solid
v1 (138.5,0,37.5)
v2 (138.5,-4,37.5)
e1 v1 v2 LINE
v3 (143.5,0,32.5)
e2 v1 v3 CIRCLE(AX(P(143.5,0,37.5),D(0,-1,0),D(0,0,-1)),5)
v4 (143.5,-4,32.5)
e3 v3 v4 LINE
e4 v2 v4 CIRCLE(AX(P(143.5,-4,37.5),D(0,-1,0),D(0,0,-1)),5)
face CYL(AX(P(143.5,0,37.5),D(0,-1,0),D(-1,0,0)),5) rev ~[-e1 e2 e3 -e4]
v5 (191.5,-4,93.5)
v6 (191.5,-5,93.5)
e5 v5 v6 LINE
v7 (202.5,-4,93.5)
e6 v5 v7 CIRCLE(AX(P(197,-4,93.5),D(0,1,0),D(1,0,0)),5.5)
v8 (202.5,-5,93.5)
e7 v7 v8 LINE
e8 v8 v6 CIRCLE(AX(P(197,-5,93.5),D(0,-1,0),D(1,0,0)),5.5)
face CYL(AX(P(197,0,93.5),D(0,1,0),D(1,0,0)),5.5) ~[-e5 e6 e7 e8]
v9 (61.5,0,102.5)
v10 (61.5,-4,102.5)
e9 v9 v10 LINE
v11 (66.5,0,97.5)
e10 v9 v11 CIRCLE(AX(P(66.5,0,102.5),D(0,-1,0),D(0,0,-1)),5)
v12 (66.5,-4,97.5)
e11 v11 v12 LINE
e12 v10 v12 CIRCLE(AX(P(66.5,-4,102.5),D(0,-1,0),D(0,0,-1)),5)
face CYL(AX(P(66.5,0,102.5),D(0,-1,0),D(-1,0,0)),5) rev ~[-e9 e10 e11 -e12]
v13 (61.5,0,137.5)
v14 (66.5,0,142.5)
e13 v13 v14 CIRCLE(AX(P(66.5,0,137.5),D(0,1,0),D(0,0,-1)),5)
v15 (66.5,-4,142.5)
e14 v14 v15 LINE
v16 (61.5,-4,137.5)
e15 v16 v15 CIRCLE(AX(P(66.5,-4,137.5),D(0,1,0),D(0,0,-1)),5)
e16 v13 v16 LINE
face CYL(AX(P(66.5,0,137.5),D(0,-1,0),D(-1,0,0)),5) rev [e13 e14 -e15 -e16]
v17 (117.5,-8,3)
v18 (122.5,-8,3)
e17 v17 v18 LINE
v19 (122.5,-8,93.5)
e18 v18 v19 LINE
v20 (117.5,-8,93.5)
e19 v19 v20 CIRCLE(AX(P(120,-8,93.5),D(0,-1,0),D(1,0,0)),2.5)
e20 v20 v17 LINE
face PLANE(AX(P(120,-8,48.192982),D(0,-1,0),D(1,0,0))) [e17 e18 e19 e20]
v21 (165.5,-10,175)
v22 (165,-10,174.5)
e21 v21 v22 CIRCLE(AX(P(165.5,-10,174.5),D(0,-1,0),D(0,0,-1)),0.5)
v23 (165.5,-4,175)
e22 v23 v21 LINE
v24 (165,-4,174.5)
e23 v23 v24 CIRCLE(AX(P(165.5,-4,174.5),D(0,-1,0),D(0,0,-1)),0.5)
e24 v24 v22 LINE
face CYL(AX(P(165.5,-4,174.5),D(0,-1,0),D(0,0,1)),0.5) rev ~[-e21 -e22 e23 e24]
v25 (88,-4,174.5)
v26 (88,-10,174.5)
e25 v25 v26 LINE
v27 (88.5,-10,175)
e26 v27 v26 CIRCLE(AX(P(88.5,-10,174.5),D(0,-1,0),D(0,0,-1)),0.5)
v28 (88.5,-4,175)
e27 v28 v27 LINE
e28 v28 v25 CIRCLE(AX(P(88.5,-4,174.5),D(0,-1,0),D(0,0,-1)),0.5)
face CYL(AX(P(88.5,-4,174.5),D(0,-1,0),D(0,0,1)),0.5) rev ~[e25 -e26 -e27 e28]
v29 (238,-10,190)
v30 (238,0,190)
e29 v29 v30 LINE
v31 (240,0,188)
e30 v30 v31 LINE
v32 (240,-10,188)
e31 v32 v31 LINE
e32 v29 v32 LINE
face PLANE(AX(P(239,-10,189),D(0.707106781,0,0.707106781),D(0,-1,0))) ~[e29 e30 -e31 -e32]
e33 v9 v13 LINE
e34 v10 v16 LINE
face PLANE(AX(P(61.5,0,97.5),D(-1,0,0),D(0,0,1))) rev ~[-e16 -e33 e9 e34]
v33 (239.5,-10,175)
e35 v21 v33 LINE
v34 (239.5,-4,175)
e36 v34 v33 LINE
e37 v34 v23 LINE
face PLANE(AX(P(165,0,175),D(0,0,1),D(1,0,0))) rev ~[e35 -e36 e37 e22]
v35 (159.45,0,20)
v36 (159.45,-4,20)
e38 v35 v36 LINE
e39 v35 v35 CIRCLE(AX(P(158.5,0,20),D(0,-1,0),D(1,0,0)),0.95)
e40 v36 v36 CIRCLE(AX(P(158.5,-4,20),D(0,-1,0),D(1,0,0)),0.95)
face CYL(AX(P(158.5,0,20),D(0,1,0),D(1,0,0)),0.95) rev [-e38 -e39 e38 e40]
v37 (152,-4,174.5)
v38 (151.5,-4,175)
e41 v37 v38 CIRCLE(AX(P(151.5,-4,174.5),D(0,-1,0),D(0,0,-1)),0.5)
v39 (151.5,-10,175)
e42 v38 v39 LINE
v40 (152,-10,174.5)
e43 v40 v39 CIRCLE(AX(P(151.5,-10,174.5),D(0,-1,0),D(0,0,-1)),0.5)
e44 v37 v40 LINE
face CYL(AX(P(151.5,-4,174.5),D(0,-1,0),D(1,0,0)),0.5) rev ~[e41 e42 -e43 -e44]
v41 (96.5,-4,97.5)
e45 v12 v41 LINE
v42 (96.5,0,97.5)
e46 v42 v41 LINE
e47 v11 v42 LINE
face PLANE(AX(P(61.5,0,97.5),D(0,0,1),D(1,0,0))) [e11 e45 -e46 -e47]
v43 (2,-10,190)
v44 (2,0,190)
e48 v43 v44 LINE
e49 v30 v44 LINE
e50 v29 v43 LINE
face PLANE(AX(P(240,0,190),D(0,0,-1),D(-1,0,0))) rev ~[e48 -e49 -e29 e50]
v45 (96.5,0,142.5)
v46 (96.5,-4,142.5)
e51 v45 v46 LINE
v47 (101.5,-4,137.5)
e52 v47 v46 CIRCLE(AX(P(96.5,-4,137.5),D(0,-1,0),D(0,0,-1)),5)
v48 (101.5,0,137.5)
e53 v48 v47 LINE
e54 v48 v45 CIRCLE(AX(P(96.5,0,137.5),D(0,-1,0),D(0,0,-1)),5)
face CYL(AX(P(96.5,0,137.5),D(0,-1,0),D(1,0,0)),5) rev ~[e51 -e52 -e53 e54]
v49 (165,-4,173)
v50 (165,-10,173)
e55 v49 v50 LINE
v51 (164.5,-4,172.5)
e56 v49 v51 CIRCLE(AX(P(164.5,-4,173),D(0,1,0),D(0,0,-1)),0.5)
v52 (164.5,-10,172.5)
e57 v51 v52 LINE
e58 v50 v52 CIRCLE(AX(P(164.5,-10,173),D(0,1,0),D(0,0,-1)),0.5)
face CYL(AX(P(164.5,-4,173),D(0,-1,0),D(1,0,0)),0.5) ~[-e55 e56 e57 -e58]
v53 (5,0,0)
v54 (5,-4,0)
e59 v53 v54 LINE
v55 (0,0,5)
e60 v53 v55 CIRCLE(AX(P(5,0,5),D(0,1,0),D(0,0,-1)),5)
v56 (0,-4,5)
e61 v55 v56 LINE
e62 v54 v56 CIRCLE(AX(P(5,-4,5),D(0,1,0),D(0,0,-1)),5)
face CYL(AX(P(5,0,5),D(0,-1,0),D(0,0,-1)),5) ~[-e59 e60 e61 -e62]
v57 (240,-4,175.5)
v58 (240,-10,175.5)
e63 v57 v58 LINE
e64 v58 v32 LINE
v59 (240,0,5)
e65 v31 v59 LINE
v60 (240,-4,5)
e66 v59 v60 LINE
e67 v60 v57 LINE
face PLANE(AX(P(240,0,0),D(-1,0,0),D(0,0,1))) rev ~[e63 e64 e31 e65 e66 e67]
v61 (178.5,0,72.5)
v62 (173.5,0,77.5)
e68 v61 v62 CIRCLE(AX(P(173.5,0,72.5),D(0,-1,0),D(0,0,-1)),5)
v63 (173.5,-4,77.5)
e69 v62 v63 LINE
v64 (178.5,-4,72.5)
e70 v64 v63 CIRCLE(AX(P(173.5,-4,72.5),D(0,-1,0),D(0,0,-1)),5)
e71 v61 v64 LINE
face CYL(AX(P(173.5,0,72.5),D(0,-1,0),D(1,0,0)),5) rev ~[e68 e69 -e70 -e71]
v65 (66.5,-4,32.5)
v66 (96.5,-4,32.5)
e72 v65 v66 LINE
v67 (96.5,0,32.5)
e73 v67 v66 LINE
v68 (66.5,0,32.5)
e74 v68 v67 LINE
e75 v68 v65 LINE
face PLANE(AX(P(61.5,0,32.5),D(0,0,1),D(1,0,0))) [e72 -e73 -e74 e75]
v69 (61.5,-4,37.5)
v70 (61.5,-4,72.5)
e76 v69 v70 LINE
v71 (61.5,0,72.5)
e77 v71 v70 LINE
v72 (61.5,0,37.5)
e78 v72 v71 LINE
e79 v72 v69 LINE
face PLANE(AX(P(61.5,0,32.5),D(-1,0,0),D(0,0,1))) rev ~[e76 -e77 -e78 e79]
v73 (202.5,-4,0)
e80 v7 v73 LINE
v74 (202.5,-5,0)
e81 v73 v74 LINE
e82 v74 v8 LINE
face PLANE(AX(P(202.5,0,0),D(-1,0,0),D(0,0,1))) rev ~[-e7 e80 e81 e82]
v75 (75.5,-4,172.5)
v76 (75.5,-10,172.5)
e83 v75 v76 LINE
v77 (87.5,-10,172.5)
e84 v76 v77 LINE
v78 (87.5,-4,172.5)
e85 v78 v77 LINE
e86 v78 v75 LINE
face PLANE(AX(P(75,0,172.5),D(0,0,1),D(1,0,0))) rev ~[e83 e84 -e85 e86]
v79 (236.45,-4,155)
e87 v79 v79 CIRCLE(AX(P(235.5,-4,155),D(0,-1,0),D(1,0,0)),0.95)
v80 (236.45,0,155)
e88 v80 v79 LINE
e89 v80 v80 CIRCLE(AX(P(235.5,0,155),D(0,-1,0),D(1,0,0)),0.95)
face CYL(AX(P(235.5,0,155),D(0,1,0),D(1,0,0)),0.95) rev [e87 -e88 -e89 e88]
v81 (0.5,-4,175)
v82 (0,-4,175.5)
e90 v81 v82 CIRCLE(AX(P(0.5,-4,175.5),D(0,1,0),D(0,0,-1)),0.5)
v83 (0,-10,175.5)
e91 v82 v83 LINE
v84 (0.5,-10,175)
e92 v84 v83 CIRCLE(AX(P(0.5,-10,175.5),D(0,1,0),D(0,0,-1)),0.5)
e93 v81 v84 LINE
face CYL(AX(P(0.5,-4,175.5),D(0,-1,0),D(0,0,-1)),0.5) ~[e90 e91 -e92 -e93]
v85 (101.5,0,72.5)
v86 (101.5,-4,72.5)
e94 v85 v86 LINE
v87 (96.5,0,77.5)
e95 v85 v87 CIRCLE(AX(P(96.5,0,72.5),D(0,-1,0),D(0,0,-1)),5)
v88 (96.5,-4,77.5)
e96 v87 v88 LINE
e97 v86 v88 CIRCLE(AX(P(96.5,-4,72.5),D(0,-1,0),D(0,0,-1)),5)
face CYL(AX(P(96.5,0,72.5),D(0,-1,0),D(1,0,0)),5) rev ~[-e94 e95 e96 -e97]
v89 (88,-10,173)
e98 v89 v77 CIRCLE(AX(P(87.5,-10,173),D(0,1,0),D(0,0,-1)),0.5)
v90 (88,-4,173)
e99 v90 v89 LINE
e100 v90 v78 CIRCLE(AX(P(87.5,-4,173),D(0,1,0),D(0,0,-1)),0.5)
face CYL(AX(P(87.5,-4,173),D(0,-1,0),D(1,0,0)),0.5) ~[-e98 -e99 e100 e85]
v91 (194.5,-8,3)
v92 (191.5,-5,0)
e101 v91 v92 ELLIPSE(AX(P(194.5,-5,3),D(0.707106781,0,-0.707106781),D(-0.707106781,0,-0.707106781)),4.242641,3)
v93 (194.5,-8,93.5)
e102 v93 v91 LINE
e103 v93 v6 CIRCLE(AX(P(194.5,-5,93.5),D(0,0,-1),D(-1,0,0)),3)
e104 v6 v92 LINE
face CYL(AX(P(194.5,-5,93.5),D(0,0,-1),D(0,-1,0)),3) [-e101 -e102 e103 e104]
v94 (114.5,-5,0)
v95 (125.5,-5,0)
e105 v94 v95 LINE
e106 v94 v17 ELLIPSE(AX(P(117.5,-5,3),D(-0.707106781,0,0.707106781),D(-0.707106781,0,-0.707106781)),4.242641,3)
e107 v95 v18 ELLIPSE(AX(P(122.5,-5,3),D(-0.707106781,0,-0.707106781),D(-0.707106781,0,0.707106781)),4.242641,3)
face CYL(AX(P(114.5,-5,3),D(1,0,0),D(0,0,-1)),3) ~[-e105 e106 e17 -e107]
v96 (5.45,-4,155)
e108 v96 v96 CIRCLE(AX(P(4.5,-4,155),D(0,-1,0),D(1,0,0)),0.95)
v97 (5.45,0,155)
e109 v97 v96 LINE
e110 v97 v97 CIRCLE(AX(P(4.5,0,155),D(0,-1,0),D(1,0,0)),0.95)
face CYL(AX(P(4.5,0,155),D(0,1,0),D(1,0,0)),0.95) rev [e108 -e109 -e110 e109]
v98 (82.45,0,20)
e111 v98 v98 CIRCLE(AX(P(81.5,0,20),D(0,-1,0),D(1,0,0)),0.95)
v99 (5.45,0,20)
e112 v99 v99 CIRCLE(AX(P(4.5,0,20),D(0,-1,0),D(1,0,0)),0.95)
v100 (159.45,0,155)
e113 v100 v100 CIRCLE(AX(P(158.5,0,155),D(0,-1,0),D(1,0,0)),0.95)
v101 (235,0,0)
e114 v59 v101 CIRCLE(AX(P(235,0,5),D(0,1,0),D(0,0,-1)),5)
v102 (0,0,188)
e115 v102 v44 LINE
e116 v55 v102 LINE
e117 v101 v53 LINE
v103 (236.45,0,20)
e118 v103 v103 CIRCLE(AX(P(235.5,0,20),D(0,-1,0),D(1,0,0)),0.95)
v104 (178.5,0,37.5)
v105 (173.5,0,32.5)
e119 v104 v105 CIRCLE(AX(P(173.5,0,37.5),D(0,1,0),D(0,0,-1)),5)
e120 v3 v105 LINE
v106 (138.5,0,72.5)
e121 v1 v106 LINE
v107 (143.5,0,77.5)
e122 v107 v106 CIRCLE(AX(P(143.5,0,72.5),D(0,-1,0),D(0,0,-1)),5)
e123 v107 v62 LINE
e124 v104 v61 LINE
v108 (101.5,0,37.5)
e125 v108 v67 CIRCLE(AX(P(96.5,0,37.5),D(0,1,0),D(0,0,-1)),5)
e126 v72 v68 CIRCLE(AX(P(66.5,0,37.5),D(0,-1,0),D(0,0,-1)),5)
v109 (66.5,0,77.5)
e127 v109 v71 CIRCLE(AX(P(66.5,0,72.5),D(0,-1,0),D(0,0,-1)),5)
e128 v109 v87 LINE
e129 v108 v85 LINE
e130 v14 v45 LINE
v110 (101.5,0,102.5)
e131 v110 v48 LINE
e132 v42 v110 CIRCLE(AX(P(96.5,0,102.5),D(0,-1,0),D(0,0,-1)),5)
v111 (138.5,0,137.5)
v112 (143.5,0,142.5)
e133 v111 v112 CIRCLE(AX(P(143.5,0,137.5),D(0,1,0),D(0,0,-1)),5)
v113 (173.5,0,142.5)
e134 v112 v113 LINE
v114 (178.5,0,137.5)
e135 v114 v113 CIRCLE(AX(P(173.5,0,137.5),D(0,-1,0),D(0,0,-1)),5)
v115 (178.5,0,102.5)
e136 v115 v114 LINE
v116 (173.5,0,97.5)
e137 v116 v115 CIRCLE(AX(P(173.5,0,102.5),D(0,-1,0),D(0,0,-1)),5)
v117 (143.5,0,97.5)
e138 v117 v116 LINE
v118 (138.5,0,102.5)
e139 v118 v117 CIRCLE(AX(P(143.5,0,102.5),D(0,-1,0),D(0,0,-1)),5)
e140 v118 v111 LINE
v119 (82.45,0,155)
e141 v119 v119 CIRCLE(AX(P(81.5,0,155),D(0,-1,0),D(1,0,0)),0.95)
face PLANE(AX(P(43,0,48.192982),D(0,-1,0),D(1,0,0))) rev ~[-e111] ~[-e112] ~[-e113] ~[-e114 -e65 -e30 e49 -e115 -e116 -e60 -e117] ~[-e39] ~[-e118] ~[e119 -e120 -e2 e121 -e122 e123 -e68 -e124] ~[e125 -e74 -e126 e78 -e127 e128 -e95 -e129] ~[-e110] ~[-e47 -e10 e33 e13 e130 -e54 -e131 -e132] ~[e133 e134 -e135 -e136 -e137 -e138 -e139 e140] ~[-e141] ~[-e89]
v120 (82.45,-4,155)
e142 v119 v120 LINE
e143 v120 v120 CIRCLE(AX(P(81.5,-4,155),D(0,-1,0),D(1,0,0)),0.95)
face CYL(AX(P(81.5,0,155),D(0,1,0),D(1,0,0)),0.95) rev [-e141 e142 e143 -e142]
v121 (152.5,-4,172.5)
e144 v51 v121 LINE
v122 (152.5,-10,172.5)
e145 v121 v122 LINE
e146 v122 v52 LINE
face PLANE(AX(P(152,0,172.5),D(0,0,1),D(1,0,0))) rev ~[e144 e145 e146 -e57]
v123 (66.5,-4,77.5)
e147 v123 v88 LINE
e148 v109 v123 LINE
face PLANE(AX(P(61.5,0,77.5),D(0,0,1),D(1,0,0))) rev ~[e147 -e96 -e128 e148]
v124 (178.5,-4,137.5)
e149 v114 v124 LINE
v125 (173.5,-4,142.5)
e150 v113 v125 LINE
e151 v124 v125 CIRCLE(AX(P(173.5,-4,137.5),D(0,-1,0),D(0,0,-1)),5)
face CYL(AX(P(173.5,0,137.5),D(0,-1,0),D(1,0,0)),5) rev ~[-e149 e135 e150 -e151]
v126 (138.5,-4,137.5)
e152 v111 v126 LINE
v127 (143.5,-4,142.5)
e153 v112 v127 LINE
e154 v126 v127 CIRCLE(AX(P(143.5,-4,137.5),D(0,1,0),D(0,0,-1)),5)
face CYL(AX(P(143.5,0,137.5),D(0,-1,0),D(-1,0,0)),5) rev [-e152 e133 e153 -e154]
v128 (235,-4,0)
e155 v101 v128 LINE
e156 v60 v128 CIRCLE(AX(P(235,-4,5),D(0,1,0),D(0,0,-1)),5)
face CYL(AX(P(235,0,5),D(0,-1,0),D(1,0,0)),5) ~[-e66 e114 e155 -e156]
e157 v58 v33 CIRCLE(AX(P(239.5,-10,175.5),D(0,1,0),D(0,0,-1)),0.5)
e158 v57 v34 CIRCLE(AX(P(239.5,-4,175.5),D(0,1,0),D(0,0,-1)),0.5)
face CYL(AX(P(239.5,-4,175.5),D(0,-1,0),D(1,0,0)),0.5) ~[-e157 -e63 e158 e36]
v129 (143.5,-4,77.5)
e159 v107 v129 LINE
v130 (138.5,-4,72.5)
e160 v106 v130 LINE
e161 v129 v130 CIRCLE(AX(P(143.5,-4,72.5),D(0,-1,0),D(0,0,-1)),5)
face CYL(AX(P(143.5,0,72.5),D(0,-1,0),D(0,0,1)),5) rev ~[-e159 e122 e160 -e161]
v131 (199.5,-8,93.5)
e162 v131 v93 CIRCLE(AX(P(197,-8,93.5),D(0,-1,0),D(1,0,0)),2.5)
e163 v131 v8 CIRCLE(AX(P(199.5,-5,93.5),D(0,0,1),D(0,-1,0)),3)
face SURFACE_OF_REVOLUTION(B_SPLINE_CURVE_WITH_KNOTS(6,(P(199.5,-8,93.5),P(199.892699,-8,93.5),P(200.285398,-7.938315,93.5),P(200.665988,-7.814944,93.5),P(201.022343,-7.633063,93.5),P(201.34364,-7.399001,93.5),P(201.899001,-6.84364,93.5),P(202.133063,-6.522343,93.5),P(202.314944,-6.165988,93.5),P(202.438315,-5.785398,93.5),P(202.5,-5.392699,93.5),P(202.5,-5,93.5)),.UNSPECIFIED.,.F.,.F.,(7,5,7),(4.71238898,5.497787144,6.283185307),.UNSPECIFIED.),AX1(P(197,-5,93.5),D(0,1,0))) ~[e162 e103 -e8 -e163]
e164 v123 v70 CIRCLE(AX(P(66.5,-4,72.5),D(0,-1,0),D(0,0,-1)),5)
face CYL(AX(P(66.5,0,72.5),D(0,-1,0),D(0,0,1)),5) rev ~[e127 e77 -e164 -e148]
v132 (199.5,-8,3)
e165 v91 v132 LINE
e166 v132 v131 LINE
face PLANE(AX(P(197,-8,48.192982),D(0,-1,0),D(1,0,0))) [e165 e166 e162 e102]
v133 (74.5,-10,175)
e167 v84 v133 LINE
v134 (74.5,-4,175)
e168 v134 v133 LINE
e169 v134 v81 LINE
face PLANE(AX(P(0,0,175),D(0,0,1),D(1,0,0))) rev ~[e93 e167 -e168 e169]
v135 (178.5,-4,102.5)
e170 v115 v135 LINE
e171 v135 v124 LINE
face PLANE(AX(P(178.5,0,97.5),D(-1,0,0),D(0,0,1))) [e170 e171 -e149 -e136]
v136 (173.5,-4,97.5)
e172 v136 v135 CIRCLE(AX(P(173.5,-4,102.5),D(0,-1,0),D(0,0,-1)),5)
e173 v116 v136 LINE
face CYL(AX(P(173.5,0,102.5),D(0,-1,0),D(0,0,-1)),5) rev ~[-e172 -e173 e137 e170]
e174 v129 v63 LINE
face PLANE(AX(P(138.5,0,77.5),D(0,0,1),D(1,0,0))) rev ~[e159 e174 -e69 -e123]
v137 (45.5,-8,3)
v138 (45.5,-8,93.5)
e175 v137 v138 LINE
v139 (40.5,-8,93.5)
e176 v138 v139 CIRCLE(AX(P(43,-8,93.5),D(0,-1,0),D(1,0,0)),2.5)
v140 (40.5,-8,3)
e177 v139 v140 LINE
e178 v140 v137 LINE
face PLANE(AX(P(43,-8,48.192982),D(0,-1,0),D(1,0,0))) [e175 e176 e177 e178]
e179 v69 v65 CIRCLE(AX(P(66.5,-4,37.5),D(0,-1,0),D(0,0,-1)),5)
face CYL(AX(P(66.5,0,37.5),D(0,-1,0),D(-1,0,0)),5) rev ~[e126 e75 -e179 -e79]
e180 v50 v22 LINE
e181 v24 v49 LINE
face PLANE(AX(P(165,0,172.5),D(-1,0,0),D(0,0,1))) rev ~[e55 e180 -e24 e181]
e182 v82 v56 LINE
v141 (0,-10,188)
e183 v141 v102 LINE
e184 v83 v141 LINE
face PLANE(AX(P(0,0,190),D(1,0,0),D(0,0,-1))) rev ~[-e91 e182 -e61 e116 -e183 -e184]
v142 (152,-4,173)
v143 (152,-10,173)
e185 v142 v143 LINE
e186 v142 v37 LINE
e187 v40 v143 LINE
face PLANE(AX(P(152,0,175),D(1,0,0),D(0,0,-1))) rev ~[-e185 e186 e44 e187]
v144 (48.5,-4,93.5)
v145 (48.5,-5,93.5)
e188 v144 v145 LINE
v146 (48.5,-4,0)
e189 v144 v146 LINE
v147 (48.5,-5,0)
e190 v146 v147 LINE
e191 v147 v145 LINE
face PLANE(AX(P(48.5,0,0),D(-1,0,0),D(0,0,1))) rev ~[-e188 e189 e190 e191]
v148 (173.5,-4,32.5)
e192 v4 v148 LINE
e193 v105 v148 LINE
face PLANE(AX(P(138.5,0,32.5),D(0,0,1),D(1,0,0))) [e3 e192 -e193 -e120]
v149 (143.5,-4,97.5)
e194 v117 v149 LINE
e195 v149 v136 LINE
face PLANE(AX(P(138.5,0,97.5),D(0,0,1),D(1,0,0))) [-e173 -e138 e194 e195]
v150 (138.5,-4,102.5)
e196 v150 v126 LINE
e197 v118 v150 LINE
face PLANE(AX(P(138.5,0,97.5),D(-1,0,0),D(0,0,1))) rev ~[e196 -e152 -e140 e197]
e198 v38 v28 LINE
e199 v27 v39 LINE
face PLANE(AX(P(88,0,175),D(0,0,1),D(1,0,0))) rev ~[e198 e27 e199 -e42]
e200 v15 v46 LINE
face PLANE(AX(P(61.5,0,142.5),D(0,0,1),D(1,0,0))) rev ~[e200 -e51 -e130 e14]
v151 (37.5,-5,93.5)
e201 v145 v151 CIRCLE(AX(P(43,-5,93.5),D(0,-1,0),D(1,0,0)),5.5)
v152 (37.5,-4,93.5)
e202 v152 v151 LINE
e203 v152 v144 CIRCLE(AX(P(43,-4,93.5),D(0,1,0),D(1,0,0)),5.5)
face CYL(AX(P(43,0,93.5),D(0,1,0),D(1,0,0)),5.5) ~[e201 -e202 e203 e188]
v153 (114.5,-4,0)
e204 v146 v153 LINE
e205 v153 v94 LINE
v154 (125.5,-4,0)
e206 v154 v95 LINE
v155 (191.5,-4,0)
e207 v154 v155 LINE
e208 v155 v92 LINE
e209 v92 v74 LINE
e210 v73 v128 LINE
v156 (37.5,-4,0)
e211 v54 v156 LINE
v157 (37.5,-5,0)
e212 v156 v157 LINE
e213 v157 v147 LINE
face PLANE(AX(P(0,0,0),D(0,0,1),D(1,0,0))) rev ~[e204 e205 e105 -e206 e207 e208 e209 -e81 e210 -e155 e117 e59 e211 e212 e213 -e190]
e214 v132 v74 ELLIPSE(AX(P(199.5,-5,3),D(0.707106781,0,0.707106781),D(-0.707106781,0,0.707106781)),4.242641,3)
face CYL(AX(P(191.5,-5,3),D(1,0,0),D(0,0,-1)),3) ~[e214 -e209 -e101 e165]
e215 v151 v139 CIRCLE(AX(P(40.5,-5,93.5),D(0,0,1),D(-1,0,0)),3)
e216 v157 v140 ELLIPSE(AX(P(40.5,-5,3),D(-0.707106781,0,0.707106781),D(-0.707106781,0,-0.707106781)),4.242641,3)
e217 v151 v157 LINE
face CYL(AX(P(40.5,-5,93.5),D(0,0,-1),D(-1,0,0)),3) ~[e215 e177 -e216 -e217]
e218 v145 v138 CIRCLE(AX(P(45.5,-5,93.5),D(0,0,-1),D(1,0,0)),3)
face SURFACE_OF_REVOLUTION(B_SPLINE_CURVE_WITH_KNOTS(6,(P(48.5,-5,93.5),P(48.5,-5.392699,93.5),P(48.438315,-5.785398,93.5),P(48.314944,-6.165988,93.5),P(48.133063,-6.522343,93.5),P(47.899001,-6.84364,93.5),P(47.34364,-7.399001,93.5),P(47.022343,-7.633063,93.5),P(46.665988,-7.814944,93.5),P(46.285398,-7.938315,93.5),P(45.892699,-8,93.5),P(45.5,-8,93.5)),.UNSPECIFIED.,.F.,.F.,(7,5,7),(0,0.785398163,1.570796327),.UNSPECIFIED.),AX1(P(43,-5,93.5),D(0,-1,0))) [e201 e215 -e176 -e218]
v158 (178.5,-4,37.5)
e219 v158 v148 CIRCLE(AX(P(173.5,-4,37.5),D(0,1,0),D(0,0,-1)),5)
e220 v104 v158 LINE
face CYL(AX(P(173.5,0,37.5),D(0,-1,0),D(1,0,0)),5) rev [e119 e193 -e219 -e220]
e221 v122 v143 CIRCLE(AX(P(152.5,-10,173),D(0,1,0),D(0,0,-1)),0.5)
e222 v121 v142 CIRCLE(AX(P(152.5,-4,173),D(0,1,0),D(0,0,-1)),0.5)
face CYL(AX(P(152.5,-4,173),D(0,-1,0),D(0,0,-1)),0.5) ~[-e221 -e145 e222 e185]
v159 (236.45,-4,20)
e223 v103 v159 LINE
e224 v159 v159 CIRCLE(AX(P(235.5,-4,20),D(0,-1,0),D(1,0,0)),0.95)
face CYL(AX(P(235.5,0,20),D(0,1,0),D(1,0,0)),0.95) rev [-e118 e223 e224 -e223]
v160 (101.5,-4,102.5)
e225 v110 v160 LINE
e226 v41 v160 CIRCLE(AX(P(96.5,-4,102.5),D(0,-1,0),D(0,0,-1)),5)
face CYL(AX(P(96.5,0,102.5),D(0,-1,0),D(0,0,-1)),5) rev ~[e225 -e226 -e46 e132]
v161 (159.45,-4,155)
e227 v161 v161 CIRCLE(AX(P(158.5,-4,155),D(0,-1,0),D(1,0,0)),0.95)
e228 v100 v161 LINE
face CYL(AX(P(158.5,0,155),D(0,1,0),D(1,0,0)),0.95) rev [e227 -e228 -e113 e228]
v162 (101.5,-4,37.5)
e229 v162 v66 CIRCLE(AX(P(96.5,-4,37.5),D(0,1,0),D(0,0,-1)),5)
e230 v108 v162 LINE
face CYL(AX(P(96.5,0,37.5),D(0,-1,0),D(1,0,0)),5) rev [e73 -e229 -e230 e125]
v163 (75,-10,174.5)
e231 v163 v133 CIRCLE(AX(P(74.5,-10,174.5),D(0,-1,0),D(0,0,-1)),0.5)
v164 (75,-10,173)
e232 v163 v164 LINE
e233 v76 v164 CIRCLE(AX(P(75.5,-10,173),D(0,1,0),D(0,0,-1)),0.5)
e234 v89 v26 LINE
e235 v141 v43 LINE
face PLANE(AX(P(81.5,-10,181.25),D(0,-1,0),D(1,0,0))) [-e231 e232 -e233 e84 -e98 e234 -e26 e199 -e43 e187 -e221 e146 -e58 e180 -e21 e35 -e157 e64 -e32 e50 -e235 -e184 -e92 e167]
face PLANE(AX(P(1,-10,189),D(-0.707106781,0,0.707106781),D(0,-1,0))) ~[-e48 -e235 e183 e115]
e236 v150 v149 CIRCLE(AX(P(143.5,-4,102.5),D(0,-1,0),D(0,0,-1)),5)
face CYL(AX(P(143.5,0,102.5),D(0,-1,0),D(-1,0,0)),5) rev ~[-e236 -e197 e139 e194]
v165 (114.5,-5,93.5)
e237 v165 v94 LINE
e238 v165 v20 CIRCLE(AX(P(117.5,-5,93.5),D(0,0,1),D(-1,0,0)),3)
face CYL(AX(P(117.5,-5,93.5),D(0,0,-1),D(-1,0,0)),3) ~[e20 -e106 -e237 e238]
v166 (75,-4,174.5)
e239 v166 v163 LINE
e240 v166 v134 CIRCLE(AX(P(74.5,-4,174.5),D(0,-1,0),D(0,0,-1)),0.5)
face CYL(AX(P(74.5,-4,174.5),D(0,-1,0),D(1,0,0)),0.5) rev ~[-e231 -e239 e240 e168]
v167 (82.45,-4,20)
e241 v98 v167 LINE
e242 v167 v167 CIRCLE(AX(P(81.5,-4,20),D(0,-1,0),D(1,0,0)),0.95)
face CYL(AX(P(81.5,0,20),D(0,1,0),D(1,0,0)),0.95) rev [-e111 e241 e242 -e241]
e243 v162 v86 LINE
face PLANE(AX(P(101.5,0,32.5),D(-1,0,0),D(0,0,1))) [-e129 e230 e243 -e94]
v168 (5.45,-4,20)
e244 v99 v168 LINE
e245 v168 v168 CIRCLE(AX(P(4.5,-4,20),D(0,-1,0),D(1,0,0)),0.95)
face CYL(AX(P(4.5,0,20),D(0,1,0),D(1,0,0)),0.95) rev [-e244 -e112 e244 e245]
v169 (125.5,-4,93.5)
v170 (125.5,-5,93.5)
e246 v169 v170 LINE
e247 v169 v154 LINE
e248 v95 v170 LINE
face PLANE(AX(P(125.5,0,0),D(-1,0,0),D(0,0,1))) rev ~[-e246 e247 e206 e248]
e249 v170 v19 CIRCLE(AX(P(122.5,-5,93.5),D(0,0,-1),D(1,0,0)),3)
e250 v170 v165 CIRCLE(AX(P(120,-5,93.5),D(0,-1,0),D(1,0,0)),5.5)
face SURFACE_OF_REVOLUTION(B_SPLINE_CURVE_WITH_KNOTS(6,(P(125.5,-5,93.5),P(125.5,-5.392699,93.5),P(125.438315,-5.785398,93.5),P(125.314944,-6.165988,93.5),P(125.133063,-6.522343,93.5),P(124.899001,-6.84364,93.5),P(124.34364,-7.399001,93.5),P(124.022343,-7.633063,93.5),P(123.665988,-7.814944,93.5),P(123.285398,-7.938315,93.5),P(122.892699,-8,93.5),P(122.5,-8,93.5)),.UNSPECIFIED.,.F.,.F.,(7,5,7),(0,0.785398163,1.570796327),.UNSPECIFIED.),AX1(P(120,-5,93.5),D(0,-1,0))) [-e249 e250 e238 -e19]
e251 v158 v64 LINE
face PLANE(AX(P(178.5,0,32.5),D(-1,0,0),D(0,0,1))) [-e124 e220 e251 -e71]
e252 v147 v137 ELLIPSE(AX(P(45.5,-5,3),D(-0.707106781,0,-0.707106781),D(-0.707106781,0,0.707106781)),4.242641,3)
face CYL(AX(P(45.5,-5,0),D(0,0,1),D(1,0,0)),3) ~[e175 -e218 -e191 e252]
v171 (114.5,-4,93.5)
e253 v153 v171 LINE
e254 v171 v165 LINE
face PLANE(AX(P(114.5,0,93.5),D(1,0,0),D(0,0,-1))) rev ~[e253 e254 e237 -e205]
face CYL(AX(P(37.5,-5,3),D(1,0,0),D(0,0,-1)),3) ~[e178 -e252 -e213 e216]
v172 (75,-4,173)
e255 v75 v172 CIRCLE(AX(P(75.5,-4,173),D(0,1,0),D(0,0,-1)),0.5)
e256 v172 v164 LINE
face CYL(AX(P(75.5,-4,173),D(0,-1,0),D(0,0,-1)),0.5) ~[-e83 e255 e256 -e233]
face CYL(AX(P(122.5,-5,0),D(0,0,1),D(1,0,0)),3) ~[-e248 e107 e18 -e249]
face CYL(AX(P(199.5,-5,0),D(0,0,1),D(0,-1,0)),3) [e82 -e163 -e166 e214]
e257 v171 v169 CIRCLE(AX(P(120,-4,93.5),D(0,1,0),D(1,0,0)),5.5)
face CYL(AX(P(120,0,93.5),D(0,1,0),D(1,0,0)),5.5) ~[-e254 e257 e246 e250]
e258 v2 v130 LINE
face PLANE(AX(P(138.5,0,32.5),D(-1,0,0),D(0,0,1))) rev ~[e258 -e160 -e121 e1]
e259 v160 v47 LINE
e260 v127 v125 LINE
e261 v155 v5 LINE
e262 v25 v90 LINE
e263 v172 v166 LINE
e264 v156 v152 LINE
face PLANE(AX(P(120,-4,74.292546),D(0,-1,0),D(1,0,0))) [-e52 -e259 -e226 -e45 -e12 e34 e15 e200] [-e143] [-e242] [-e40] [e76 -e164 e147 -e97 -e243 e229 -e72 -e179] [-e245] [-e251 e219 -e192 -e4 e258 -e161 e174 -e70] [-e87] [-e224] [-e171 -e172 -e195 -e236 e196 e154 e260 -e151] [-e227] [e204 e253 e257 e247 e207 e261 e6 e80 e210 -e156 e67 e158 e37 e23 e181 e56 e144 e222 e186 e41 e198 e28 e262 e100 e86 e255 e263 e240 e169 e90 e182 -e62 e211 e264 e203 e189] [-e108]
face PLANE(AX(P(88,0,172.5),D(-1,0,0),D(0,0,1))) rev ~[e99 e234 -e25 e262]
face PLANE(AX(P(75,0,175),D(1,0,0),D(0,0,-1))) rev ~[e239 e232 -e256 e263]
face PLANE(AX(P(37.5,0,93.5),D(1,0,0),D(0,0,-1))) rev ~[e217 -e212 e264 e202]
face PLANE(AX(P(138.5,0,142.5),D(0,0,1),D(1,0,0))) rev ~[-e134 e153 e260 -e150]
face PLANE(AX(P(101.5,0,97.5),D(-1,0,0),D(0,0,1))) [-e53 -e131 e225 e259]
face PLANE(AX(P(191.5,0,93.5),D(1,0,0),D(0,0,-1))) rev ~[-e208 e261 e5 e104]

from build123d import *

# Parameters (mm, degrees)
F0_R     = 0.95
F0_W     = 40
F0_H     = 45
F0_W_2   = 75
F0_H_2   = 15
F0_W_3   = 64
F1_DEPTH = 4
F2_DEPTH = 8
F3_DEPTH = 10
F4_R     = 5
F5_SIZE  = 2
F6_R     = 3
F7_R     = 0.5


# Not quite as in the source:
# - a feature names something its author has since deleted; it is built from what else it names


with BuildPart() as f1:
    # F0 (on Front) → F1 (new body)
    with BuildSketch(Plane.XZ):
        with BuildLine():
            Line((0, 175), (0, 0))
            Line((0, 0), (37.5, 0))
            Line((37.5, 0), (37.5, 93.5))
            ThreePointArc((37.5, 93.5), (43, 99), (48.5, 93.5))
            Line((48.5, 93.5), (48.5, 0))
            Line((48.5, 0), (114.5, 0))
            Line((114.5, 0), (114.5, 93.5))
            ThreePointArc((114.5, 93.5), (120, 99), (125.5, 93.5))
            Line((125.5, 93.5), (125.5, 0))
            Line((125.5, 0), (191.5, 0))
            Line((191.5, 0), (191.5, 93.5))
            ThreePointArc((191.5, 93.5), (197, 99), (202.5, 93.5))
            Line((202.5, 93.5), (202.5, 0))
            Line((202.5, 0), (240, 0))
            Line((240, 0), (240, 175))
            Line((240, 175), (165, 175))
            Line((165, 175), (165, 172.5))
            Line((165, 172.5), (152, 172.5))
            Line((152, 172.5), (152, 175))
            Line((152, 175), (88, 175))
            Line((88, 175), (88, 172.5))
            Line((88, 172.5), (75, 172.5))
            Line((75, 172.5), (75, 175))
            Line((75, 175), (0, 175))
        make_face()
        with Locations((4.5, 20)):
            Circle(F0_R, mode=Mode.SUBTRACT)
        with Locations((81.5, 20)):
            Circle(F0_R, mode=Mode.SUBTRACT)
        with Locations((81.5, 55)):
            Rectangle(F0_W, F0_H, mode=Mode.SUBTRACT)
        with Locations((158.5, 20)):
            Circle(F0_R, mode=Mode.SUBTRACT)
        with Locations((235.5, 20)):
            Circle(F0_R, mode=Mode.SUBTRACT)
        with Locations((158.5, 55)):
            Rectangle(F0_W, F0_H, mode=Mode.SUBTRACT)
        with Locations((81.5, 120)):
            Rectangle(F0_W, F0_H, mode=Mode.SUBTRACT)
        with Locations((4.5, 155)):
            Circle(F0_R, mode=Mode.SUBTRACT)
        with Locations((81.5, 155)):
            Circle(F0_R, mode=Mode.SUBTRACT)
        with Locations((158.5, 120)):
            Rectangle(F0_W, F0_H, mode=Mode.SUBTRACT)
        with Locations((158.5, 155)):
            Circle(F0_R, mode=Mode.SUBTRACT)
        with Locations((235.5, 155)):
            Circle(F0_R, mode=Mode.SUBTRACT)
        with Locations((202.5, 182.5)):
            Rectangle(F0_W_2, F0_H_2)
        Polygon((165, 190), (152, 190), (152, 175), (152, 172.5), (165, 172.5), (165, 175), align=None)
        with Locations((120, 182.5)):
            Rectangle(F0_W_3, F0_H_2)
        Polygon((75, 190), (75, 175), (75, 172.5), (88, 172.5), (88, 175), (88, 190), align=None)
        with Locations((37.5, 182.5)):
            Rectangle(F0_W_2, F0_H_2)
        with BuildLine():
            Line((37.5, 93.5), (37.5, 0))
            Line((37.5, 0), (48.5, 0))
            Line((48.5, 0), (48.5, 93.5))
            ThreePointArc((48.5, 93.5), (43, 99), (37.5, 93.5))
        make_face()
        with BuildLine():
            Line((114.5, 93.5), (114.5, 0))
            Line((114.5, 0), (125.5, 0))
            Line((125.5, 0), (125.5, 93.5))
            ThreePointArc((125.5, 93.5), (120, 99), (114.5, 93.5))
        make_face()
        with BuildLine():
            Line((191.5, 93.5), (191.5, 0))
            Line((191.5, 0), (202.5, 0))
            Line((202.5, 0), (202.5, 93.5))
            ThreePointArc((202.5, 93.5), (197, 99), (191.5, 93.5))
        make_face()
    extrude(amount=F1_DEPTH)

    # F0 (on Front) → F2 (join)
    with BuildSketch(Plane.XZ):
        with BuildLine():
            Line((37.5, 93.5), (37.5, 0))
            Line((37.5, 0), (48.5, 0))
            Line((48.5, 0), (48.5, 93.5))
            ThreePointArc((48.5, 93.5), (43, 99), (37.5, 93.5))
        make_face()
        with BuildLine():
            Line((114.5, 93.5), (114.5, 0))
            Line((114.5, 0), (125.5, 0))
            Line((125.5, 0), (125.5, 93.5))
            ThreePointArc((125.5, 93.5), (120, 99), (114.5, 93.5))
        make_face()
        with BuildLine():
            Line((191.5, 93.5), (191.5, 0))
            Line((191.5, 0), (202.5, 0))
            Line((202.5, 0), (202.5, 93.5))
            ThreePointArc((202.5, 93.5), (197, 99), (191.5, 93.5))
        make_face()
    extrude(amount=F2_DEPTH)

    # F0 (on Front) → F3 (join)
    with BuildSketch(Plane.XZ):
        Polygon((75, 190), (75, 175), (75, 172.5), (88, 172.5), (88, 175), (88, 190), align=None)
        Polygon((165, 190), (152, 190), (152, 175), (152, 172.5), (165, 172.5), (165, 175), align=None)
        with Locations((202.5, 182.5)):
            Rectangle(F0_W_2, F0_H_2)
        with Locations((120, 182.5)):
            Rectangle(F0_W_3, F0_H_2)
        with Locations((37.5, 182.5)):
            Rectangle(F0_W_2, F0_H_2)
    extrude(amount=F3_DEPTH)

    # F4
    f4_edges = [f1.edges().sort_by_distance(p)[0] for p in [
        (0, -2, 0),
        (240, -2, 0),
        (138.5, -2, 32.5),
        (178.5, -2, 32.5),
        (178.5, -2, 77.5),
        (138.5, -2, 77.5),
        (138.5, -2, 142.5),
        (178.5, -2, 142.5),
        (178.5, -2, 97.5),
        (138.5, -2, 97.5),
        (61.5, -2, 32.5),
        (101.5, -2, 32.5),
        (101.5, -2, 77.5),
        (61.5, -2, 77.5),
        (101.5, -2, 97.5),
        (101.5, -2, 142.5),
        (61.5, -2, 142.5),
        (61.5, -2, 97.5),
    ]]
    fillet(f4_edges, radius=F4_R)

    # F5
    f5_edges = [f1.edges().sort_by_distance(p)[0] for p in [
        (240, -5, 190),
        (0, -5, 190),
    ]]
    chamfer(f5_edges, length=F5_SIZE)

    # F6
    f6_edges = [f1.edges().sort_by_distance(p)[0] for p in [
        (37.5, -8, 46.75),
        (43, -8, 0),
        (48.5, -8, 46.75),
        (43, -8, 99),
        (114.5, -8, 46.75),
        (120, -8, 0),
        (125.5, -8, 46.75),
        (120, -8, 99),
        (191.5, -8, 46.75),
        (197, -8, 0),
        (202.5, -8, 46.75),
        (197, -8, 99),
    ]]
    fillet(f6_edges, radius=F6_R)

    # F7
    f7_edges = [f1.edges().sort_by_distance(p)[0] for p in [
        (75, -7, 172.5),
        (75, -7, 175),
        (88, -7, 172.5),
        (88, -7, 175),
        (152, -7, 175),
        (152, -7, 172.5),
        (165, -7, 172.5),
        (165, -7, 175),
        (240, -7, 175),
        (0, -7, 175),
    ]]
    fillet(f7_edges, radius=F7_R)


solid = f1.part
